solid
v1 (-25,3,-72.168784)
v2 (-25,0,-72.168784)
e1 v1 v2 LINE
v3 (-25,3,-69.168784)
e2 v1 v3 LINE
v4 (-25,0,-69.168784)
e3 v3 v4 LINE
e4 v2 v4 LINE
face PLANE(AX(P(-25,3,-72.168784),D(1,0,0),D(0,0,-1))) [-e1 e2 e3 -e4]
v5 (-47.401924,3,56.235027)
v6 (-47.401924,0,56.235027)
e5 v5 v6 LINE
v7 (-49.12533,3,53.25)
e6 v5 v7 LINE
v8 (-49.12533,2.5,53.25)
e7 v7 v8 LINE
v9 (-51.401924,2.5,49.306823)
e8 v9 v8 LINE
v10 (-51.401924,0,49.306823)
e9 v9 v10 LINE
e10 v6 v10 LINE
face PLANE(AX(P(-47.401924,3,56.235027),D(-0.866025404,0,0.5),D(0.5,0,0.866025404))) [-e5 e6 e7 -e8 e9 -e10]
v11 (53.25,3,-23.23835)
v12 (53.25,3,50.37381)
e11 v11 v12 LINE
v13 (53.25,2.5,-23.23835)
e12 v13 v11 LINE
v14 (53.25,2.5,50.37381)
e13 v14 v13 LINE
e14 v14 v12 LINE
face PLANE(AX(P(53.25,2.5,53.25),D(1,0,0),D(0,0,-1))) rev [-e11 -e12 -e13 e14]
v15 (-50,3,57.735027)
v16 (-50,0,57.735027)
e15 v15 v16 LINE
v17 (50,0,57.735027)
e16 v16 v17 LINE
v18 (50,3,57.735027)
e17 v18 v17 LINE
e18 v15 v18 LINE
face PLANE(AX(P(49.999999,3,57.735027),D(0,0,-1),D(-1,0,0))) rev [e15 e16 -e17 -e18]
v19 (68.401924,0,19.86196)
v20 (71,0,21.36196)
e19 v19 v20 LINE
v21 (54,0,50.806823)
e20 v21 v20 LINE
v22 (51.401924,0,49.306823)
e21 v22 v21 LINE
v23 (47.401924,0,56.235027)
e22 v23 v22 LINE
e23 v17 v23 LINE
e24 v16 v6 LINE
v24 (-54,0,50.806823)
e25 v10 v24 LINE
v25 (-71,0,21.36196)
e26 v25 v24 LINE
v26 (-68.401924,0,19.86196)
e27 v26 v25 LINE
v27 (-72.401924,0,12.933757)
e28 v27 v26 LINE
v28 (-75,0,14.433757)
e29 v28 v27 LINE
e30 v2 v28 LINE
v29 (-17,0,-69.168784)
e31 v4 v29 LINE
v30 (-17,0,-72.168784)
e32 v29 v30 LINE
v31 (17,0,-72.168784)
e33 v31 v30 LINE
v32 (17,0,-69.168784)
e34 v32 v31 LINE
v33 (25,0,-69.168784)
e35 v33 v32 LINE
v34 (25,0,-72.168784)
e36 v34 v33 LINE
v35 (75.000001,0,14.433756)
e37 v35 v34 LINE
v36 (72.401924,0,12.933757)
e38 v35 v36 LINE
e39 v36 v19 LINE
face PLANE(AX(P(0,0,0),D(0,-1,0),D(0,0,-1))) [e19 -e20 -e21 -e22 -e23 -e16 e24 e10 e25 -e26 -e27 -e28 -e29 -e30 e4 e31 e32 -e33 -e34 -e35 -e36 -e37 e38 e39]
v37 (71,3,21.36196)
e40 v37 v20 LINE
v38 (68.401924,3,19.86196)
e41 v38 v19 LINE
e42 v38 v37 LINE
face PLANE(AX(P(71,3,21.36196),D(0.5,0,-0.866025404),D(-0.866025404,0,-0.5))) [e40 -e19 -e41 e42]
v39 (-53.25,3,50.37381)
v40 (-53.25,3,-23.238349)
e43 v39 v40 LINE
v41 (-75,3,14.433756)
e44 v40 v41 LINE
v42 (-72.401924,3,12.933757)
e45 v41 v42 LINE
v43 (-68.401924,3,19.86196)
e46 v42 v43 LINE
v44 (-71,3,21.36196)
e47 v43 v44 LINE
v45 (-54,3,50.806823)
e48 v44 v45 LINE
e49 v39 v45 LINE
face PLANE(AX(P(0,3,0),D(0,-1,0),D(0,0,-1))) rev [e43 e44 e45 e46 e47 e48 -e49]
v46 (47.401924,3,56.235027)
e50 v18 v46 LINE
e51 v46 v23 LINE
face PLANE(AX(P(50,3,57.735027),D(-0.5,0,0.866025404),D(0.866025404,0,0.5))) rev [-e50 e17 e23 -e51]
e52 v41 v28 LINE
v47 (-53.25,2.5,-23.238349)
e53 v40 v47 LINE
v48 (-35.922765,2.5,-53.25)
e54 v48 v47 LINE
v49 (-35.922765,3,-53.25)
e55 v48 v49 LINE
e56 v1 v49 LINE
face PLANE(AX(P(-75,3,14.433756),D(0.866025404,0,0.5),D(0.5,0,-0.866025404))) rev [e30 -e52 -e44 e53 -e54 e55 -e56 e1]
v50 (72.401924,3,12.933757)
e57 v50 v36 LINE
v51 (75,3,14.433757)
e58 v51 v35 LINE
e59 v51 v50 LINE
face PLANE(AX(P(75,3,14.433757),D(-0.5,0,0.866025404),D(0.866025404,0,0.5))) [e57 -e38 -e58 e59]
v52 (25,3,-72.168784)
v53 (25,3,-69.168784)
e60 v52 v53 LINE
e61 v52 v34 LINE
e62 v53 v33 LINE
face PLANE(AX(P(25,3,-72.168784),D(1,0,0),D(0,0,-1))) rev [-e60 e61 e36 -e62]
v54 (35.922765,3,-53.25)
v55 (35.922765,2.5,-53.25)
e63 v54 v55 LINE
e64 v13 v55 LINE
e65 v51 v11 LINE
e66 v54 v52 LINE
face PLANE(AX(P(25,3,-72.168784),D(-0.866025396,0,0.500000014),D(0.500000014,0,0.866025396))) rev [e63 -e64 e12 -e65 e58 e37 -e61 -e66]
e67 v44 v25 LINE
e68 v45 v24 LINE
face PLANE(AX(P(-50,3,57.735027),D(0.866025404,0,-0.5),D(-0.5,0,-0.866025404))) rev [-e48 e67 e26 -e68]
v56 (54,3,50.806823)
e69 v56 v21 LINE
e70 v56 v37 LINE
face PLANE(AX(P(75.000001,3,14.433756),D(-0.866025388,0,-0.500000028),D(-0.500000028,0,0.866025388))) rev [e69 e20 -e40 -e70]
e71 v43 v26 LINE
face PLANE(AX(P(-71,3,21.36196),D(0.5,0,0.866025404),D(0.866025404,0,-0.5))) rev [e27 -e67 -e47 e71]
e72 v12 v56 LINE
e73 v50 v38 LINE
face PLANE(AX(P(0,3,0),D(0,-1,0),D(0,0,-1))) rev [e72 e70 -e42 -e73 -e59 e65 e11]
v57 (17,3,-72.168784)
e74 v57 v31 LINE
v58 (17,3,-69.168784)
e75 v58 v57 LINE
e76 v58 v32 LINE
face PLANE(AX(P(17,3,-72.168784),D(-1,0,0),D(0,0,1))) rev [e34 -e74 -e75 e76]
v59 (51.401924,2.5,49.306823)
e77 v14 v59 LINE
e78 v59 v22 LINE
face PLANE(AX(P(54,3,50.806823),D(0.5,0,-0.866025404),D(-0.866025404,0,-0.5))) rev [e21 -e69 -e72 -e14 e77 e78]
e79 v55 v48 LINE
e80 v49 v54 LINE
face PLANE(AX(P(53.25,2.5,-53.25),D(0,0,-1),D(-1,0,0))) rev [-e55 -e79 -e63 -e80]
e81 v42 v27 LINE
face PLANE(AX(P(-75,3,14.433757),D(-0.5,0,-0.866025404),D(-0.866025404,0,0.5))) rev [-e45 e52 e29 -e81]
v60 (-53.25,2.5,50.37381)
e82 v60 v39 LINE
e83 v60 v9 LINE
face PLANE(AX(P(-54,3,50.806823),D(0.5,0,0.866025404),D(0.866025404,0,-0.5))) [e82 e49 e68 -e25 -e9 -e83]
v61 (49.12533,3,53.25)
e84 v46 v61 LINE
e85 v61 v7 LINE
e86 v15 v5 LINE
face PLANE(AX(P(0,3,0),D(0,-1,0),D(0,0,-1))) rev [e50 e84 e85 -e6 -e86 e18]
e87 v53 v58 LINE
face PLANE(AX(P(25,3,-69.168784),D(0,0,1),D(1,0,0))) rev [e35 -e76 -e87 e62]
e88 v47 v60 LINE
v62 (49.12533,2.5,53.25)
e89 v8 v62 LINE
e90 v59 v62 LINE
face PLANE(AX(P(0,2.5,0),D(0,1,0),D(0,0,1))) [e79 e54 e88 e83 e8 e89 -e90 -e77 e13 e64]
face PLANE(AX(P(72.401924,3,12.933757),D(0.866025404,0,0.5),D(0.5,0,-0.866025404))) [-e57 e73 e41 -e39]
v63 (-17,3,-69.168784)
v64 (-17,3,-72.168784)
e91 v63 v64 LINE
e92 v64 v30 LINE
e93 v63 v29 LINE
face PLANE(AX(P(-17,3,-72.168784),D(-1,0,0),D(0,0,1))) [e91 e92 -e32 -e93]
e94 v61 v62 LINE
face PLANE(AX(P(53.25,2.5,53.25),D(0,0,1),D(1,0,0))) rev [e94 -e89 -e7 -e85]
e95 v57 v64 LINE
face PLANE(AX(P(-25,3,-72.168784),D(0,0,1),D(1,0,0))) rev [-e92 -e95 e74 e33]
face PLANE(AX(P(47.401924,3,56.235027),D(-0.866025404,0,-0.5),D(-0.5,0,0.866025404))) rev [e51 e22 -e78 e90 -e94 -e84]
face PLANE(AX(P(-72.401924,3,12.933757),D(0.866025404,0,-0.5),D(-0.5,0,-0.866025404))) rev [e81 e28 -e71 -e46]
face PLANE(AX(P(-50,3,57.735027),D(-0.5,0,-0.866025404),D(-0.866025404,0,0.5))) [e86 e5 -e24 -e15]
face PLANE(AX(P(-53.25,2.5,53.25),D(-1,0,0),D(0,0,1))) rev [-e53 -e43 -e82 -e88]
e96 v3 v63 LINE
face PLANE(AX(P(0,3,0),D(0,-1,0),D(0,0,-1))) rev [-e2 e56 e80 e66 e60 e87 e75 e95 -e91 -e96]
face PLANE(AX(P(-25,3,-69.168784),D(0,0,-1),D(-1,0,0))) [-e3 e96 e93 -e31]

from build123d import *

# Parameters (mm, degrees)
BOSS_EXTRUDE1_DEPTH     = 3
SKETCH2_W               = 106.5
SKETCH2_H               = 106.5
CUT_EXTRUDE1_DEPTH      = 0.5
SKETCH4_W               = 8
SKETCH4_H               = 3
CUT_EXTRUDE2_DEPTH      = 105.126526789
CIRPATTERN1_START       = -24.999999535
CIRPATTERN1_OUTLINE_W   = 3
CIRPATTERN1_OUTLINE_H   = 3
CIRPATTERN1_DEPTH       = 8
CIRPATTERN1_START_2     = 16.999999535
CIRPATTERN1_2_OUTLINE_W = 3
CIRPATTERN1_2_OUTLINE_H = 3
CIRPATTERN1_2_DEPTH     = 8
CIRPATTERN1_3_DEPTH     = 8
CIRPATTERN1_4_DEPTH     = 8


# Read off the part's stored shape, not the designer's step: CirPattern1
with BuildPart() as part:
    # Sketch1 → Boss-Extrude1 (new body)
    with BuildSketch(Plane(origin=(0, 0, 0), x_dir=(1, 0, 0), z_dir=(0, 1, 0))):
        Polygon((-25.000000465, 72.168783917), (24.999999535, 72.168783917), (75.000001394, -14.433756462), (49.999999071, -57.735027455), (-50, -57.735027455), (-75.000000465, -14.433756462), align=None)
    extrude(amount=BOSS_EXTRUDE1_DEPTH)

    # Sketch2 → Cut-Extrude1 (cut)
    with BuildSketch(Plane(origin=(0, 3, 0), x_dir=(1, 0, 0), z_dir=(0, 1, 0))):
        Rectangle(SKETCH2_W, SKETCH2_H)
    extrude(amount=-CUT_EXTRUDE1_DEPTH, mode=Mode.SUBTRACT)

    # Sketch4 → Cut-Extrude2 (cut, through all)
    with BuildSketch(Plane.XZ):
        with Locations((20.999999535, -70.668783917)):
            Rectangle(SKETCH4_W, SKETCH4_H)
    cut_extrude2 = extrude(amount=-CUT_EXTRUDE2_DEPTH, mode=Mode.SUBTRACT)

    # Mirror1: Cut-Extrude2 across plane
    add(cut_extrude2.mirror(Plane(origin=(0, 0, 0), x_dir=(0, 0, 1), z_dir=(1, 0, 0))), mode=Mode.SUBTRACT)

    # CirPattern1 outline → CirPattern1 (cut)
    with BuildSketch(Plane(origin=(0, 0, 0), x_dir=(0.8660254037844362, 0, -0.5000000000000042), z_dir=(0.5000000000000042, 0, 0.8660254037844363)).offset(CIRPATTERN1_START)):
        with Locations((-70.668783917, 1.5)):
            Rectangle(CIRPATTERN1_OUTLINE_W, CIRPATTERN1_OUTLINE_H)
    extrude(amount=CIRPATTERN1_DEPTH, mode=Mode.SUBTRACT)

    # CirPattern1 2 outline → CirPattern1 2 (cut)
    with BuildSketch(Plane(origin=(0, 0, 0), x_dir=(0.8660254037844362, 0, -0.5000000000000042), z_dir=(0.5000000000000042, 0, 0.8660254037844363)).offset(CIRPATTERN1_START_2)):
        with Locations((-70.668783917, 1.5)):
            Rectangle(CIRPATTERN1_2_OUTLINE_W, CIRPATTERN1_2_OUTLINE_H)
    extrude(amount=CIRPATTERN1_2_DEPTH, mode=Mode.SUBTRACT)

    # CirPattern1 3 outline → CirPattern1 3 (cut)
    with BuildSketch(Plane(origin=(0, 0, 0), x_dir=(0.8660254037844431, 0, 0.4999999999999921), z_dir=(0.4999999999999921, 0, -0.8660254037844433)).offset(CIRPATTERN1_START)):
        Polygon((69.168783917, -3), (72.168784721, -3), (72.168784587, 0), (69.168783917, 0), align=None)
    extrude(amount=CIRPATTERN1_3_DEPTH, mode=Mode.SUBTRACT)

    # CirPattern1 4 outline → CirPattern1 4 (cut)
    with BuildSketch(Plane(origin=(0, 0, 0), x_dir=(0.8660254037844431, 0, 0.4999999999999921), z_dir=(0.4999999999999921, 0, -0.8660254037844433)).offset(CIRPATTERN1_START_2)):
        Polygon((69.168783917, -3), (72.168784721, -3), (72.168784587, 0), (69.168783917, 0), align=None)
    extrude(amount=CIRPATTERN1_4_DEPTH, mode=Mode.SUBTRACT)


solid = part.part
